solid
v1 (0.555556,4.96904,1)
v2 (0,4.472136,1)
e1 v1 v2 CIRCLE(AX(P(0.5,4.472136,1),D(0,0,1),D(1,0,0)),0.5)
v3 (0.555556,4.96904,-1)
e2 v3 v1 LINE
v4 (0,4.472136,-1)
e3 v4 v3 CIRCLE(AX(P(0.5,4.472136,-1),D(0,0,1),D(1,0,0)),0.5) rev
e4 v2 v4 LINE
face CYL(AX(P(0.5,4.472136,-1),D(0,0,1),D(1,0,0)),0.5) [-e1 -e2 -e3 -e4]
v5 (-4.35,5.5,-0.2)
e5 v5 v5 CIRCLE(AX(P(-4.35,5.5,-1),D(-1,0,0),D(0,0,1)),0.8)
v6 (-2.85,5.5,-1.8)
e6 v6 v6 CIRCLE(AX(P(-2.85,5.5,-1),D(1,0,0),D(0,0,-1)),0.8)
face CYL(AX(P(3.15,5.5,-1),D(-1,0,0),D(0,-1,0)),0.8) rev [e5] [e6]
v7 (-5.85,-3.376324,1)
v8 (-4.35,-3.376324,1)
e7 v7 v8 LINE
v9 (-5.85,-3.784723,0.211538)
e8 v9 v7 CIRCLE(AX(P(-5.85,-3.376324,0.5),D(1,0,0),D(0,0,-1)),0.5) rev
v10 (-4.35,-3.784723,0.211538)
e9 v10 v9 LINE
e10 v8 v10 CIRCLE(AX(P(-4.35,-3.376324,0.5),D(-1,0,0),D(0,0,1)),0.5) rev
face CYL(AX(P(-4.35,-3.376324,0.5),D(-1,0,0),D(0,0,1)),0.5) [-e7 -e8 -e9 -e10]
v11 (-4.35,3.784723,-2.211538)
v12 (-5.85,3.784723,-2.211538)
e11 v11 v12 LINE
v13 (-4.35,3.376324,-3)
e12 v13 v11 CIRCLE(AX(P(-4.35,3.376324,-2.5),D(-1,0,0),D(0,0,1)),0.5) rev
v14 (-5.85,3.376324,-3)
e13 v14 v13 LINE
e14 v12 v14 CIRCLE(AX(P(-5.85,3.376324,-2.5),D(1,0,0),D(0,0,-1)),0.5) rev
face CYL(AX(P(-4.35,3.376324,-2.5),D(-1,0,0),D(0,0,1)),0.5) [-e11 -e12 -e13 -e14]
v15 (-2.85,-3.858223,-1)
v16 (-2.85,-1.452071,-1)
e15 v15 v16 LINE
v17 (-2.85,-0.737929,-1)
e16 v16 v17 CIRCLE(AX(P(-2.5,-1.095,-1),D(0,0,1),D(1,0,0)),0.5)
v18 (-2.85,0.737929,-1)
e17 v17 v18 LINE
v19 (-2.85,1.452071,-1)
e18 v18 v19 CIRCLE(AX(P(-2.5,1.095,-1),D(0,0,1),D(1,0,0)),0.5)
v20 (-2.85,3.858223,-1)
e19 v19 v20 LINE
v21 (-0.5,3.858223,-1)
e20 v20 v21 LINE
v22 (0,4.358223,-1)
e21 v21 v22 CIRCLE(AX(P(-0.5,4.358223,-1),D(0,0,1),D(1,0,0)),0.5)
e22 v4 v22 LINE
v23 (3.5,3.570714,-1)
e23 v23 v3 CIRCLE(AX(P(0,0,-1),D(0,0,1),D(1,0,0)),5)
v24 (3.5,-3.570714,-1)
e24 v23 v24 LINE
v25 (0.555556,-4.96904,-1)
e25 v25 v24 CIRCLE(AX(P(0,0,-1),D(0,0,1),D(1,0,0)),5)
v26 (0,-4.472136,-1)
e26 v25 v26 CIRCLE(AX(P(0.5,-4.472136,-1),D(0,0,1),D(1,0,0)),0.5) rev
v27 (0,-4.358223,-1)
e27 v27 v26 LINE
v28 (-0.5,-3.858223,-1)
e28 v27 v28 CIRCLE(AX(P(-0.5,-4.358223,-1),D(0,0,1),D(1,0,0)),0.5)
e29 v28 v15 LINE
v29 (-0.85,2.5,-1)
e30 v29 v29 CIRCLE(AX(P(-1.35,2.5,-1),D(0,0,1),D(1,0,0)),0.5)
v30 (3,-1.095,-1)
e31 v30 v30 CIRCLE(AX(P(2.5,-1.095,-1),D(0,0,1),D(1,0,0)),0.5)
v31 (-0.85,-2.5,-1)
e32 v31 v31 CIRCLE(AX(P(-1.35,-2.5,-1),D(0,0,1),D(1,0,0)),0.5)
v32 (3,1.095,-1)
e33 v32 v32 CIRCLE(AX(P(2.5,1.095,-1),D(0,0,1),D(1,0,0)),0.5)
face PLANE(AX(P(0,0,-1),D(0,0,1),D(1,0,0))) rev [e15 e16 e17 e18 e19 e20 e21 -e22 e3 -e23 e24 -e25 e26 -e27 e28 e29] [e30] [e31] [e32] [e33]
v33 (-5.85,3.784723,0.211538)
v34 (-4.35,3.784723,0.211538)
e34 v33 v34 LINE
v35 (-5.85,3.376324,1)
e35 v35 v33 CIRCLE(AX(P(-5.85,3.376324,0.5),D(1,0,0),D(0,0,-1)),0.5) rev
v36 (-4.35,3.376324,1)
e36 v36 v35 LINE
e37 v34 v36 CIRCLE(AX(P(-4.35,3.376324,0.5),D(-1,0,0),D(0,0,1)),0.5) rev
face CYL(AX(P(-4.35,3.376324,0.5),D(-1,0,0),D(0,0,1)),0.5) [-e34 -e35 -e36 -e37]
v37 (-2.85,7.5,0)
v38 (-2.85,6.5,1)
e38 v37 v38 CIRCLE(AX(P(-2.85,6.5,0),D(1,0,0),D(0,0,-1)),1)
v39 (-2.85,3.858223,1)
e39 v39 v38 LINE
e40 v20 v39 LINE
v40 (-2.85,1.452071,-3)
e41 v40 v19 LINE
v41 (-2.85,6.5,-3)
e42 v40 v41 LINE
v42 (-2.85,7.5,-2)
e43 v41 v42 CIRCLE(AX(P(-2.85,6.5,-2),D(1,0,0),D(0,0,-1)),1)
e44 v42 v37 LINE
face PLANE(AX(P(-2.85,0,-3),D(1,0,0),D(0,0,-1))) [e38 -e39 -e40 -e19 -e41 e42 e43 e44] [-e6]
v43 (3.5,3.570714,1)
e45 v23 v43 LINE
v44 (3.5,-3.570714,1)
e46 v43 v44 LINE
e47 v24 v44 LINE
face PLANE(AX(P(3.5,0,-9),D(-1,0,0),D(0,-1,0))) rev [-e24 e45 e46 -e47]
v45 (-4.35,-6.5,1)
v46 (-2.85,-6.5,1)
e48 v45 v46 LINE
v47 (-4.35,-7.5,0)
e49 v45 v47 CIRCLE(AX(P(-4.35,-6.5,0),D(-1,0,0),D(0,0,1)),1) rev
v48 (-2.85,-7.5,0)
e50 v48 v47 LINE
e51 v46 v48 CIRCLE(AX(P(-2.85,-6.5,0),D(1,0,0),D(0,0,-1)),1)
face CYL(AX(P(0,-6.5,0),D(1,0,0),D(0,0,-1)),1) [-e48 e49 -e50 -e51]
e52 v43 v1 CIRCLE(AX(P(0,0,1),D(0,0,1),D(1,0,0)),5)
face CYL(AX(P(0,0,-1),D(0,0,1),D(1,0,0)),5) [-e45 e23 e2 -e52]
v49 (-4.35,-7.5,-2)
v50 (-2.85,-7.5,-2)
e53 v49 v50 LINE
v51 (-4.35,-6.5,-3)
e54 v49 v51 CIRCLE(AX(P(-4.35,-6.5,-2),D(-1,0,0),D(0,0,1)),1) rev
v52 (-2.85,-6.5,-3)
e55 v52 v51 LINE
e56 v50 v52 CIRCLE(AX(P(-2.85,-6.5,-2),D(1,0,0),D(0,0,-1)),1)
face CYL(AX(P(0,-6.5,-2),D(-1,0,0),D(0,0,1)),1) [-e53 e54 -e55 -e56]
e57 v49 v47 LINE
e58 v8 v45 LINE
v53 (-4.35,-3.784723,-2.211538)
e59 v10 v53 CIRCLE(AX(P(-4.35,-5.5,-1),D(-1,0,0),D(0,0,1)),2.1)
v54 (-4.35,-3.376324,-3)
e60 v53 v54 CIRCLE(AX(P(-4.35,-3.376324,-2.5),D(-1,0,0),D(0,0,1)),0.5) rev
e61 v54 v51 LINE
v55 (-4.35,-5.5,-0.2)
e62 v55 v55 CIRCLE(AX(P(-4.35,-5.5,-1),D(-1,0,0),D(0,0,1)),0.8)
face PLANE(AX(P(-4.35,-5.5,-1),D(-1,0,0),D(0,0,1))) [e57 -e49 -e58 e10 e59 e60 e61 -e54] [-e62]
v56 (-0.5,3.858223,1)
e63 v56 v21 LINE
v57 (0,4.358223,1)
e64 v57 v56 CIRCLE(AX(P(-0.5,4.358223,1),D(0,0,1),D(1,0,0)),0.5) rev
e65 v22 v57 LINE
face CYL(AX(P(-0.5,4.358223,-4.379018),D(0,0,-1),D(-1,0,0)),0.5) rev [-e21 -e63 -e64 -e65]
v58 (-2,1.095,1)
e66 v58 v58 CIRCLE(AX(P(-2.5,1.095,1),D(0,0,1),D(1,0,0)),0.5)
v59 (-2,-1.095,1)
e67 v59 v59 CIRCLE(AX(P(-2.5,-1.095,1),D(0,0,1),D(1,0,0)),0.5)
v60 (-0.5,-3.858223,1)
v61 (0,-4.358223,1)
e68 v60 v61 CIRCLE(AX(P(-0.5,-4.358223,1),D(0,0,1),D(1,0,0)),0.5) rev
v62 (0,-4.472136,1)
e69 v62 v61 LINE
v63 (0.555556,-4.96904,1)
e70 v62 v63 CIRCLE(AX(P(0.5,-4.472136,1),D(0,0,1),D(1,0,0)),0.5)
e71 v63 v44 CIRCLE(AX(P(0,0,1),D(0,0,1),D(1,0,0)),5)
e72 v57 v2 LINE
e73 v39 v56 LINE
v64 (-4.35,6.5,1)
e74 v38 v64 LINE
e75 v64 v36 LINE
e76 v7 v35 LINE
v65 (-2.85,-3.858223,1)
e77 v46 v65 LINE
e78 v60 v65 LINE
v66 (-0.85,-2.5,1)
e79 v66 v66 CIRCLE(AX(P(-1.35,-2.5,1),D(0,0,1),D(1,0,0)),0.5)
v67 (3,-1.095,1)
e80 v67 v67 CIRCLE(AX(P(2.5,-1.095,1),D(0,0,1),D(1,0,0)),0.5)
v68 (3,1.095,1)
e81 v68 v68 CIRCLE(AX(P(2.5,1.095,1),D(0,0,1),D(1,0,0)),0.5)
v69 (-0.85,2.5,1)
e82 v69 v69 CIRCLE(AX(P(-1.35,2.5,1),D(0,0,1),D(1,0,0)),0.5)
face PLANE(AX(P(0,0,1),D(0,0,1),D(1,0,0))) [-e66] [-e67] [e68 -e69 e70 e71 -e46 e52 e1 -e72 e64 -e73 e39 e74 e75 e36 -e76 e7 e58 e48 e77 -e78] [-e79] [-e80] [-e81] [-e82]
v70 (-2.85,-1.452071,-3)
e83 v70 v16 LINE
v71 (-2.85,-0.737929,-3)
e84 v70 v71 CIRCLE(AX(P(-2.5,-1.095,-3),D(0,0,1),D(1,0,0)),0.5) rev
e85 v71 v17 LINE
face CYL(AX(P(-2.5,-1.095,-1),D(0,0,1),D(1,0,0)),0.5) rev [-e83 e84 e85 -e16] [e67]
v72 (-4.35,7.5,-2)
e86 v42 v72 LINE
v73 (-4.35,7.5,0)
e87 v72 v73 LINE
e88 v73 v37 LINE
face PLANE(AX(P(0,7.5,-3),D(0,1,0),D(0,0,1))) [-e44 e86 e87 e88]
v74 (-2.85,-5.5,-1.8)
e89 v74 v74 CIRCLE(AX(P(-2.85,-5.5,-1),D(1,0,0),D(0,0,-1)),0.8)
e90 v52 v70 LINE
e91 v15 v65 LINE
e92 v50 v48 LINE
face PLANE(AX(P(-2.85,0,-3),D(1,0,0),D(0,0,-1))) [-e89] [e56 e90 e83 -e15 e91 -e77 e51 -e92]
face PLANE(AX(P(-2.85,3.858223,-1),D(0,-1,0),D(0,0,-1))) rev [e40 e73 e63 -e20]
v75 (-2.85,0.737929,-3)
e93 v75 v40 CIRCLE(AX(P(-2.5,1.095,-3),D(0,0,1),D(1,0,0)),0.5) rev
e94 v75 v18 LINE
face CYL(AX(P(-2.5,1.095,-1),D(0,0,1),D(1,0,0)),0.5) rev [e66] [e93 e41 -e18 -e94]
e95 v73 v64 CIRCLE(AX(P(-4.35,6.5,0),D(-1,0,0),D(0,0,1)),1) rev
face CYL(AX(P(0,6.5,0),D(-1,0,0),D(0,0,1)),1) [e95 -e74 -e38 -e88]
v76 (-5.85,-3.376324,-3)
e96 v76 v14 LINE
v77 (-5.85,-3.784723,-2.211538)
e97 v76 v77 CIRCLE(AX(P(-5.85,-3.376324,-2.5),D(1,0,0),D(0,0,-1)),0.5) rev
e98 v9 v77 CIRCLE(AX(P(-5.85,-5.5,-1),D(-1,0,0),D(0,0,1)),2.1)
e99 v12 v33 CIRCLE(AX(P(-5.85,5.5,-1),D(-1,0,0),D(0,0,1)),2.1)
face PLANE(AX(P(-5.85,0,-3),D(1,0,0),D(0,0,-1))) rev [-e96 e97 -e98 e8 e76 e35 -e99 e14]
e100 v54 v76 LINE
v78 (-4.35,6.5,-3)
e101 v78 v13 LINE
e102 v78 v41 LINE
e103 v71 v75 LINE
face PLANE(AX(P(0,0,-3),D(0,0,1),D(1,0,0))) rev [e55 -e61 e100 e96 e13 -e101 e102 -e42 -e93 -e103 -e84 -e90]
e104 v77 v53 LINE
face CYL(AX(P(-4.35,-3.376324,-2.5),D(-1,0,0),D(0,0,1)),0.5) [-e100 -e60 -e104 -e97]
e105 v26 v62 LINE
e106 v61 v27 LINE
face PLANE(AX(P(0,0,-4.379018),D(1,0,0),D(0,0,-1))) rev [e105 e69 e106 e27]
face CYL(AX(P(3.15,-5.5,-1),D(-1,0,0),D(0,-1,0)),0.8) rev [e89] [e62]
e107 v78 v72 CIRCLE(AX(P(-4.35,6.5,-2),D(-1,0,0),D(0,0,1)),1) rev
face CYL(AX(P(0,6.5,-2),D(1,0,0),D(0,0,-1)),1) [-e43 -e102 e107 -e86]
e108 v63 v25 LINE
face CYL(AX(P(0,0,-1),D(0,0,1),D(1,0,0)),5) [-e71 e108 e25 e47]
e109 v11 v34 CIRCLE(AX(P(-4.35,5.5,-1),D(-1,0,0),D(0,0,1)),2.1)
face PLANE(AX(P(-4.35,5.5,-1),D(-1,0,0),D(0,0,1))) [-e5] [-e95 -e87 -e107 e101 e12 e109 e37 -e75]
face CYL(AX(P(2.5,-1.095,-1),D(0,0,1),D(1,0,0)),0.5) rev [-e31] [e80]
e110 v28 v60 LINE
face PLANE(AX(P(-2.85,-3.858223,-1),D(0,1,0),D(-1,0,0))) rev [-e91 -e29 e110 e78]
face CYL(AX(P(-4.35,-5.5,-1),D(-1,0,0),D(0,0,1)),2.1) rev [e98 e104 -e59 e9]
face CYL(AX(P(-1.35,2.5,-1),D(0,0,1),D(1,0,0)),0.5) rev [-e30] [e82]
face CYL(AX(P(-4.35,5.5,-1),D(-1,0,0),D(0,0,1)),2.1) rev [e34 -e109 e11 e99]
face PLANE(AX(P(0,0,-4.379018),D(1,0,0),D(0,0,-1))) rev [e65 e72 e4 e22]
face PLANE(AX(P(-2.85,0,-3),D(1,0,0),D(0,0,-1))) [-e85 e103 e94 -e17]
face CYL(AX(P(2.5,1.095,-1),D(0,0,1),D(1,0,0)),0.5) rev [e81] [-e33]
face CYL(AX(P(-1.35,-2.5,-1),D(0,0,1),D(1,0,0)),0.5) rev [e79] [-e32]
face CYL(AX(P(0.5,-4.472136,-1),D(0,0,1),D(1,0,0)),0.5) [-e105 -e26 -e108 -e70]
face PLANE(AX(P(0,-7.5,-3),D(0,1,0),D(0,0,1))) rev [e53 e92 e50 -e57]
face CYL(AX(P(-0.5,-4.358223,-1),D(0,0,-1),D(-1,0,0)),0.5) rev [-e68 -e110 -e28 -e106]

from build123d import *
from build123d.topology import SkipClean

# Parameters (mm, degrees)
BOSS_EXTRUDE1_DEPTH       = 1
BOSS_EXTRUDE1_DEPTH_BACK  = 1
SKETCH1_R                 = 5
SKETCH1_R_2               = 0.5
BOSS_EXTRUDE2_START       = -5.85
BOSS_EXTRUDE2_OUTLINE_W   = 15
BOSS_EXTRUDE2_OUTLINE_H   = 4
BOSS_EXTRUDE2_DEPTH       = 3
BOSS_EXTRUDE2_START_2     = -4
BOSS_EXTRUDE2_2_OUTLINE_R = 0.5
BOSS_EXTRUDE2_2_DEPTH     = 6
CUT_EXTRUDE4_DEPTH        = 8
SKETCH6_R                 = 0.8
CUT_EXTRUDE3_DEPTH        = 9
SKETCH9_W                 = 8
SKETCH9_H                 = 0.25
CUT_EXTRUDE5_DEPTH        = 2
SKETCH10_R                = 2.1
SKETCH10_R_2              = 0.8
CUT_EXTRUDE6_DEPTH        = 1.5
FILLET2_R                 = 1
FILLET3_START             = -5.85
FILLET3_DEPTH             = 1.5
CUT_EXTRUDE2_START        = -10
CUT_EXTRUDE2_DEPTH        = 10
BOSS_EXTRUDE3_START       = -2
BOSS_EXTRUDE3_DEPTH       = 2
FILLET4_R                 = 0.5
CUT_EXTRUDE7_DEPTH        = 1.5


with BuildPart() as part:
    # Sketch1 → Boss-Extrude1 (new, two sides: drawn at the far end of the back side and taken through both)
    with BuildSketch(Plane.XY.offset(-BOSS_EXTRUDE1_DEPTH_BACK)):
        Circle(SKETCH1_R)
        with Locations((-2.5, 1.095)):
            Circle(SKETCH1_R_2, mode=Mode.SUBTRACT)
        with Locations((2.5, 1.095)):
            Circle(SKETCH1_R_2, mode=Mode.SUBTRACT)
        with Locations((-2.5, -1.095)):
            Circle(SKETCH1_R_2, mode=Mode.SUBTRACT)
        with Locations((2.5, -1.095)):
            Circle(SKETCH1_R_2, mode=Mode.SUBTRACT)
        with Locations((-1.35, 2.5)):
            Circle(SKETCH1_R_2, mode=Mode.SUBTRACT)
        with Locations((-1.35, -2.5)):
            Circle(SKETCH1_R_2, mode=Mode.SUBTRACT)
    extrude(amount=BOSS_EXTRUDE1_DEPTH + BOSS_EXTRUDE1_DEPTH_BACK)

    # Boss-Extrude2: read off the stored shape, not the designer's step
    # Boss-Extrude2 outline → Boss-Extrude2 (add)
    with BuildSketch(Plane.YZ.offset(BOSS_EXTRUDE2_START)):
        with Locations((0, -1)):
            Rectangle(BOSS_EXTRUDE2_OUTLINE_W, BOSS_EXTRUDE2_OUTLINE_H)
    extrude(amount=BOSS_EXTRUDE2_DEPTH)

    # Boss-Extrude2 2 outline → Boss-Extrude2 2 (cut)
    with SkipClean():  # the faces are left unmerged after this step: merging them gives an invalid solid
        with BuildSketch(Plane.XY.offset(BOSS_EXTRUDE2_START_2)):
            with Locations((-2.5, 1.095)):
                Circle(BOSS_EXTRUDE2_2_OUTLINE_R)
            with Locations((-2.5, -1.095)):
                Circle(BOSS_EXTRUDE2_2_OUTLINE_R)
        extrude(amount=BOSS_EXTRUDE2_2_DEPTH, mode=Mode.SUBTRACT)

    # Sketch7 → Cut-Extrude4 (cut)
    with SkipClean():  # the faces are left unmerged after this step: merging them gives an invalid solid
        with BuildSketch(Plane(origin=(-2.85, 0, 0), x_dir=(0, 0, -1), z_dir=(1, 0, 0))):
            Polygon((-1, 7.5), (-1, 4.10822346), (1, 4.10822346), (1, 1.452071421), (3, 1.452071421), (3, 7.5), align=None)
            Polygon((-1, -4.10822346), (-1, -7.5), (3, -7.5), (3, -1.452071421), (1, -1.452071421), (1, -4.10822346), align=None)
        extrude(amount=CUT_EXTRUDE4_DEPTH, mode=Mode.SUBTRACT)

    # Sketch6 → Cut-Extrude3 (cut)
    with SkipClean():  # the faces are left unmerged after this step: merging them gives an invalid solid
        with BuildSketch(Plane.ZY.offset(5.85)):
            with Locations(Location((-1, 5.5, 0), (0, 0, 270))):
                Circle(SKETCH6_R)
            with Locations(Location((-1, -5.5, 0), (0, 0, 270))):
                Circle(SKETCH6_R)
        extrude(amount=-CUT_EXTRUDE3_DEPTH, mode=Mode.SUBTRACT)

    # Sketch9 → Cut-Extrude5 (cut)
    with SkipClean():  # the faces are left unmerged after this step: merging them gives an invalid solid
        with BuildSketch(Plane.XY.offset(1)):
            with Locations((1.15, 3.98322346)):
                Rectangle(SKETCH9_W, SKETCH9_H)
            with Locations((1.15, -3.98322346)):
                Rectangle(SKETCH9_W, SKETCH9_H)
        extrude(amount=-CUT_EXTRUDE5_DEPTH, mode=Mode.SUBTRACT)

    # Sketch10 → Cut-Extrude6 (cut)
    # profile 1 of 2: a face of its own
    with SkipClean():  # the faces are left unmerged after this step: merging them gives an invalid solid
        with BuildSketch(Plane.ZY.offset(5.85)):
            with Locations((-1, 5.5)):
                Circle(SKETCH10_R)
            with Locations((-1, 5.5)):
                Circle(SKETCH10_R_2, mode=Mode.SUBTRACT)
        # profile 2 of 2: a face of its own
        with BuildSketch(Plane.ZY.offset(5.85)):
            with Locations((-1, -5.5)):
                Circle(SKETCH10_R)
            with Locations((-1, -5.5)):
                Circle(SKETCH10_R_2, mode=Mode.SUBTRACT)
        extrude(amount=-CUT_EXTRUDE6_DEPTH, mode=Mode.SUBTRACT)

    # Fillet2
    fillet2_edges = [part.edges().sort_by_distance(p)[0] for p in [
        (-4.35, 7.5, -3),
        (-4.35, -7.5, 1),
        (-4.35, -7.5, -3),
        (-4.35, 7.5, 1),
    ]]
    fillet(fillet2_edges, radius=FILLET2_R)

    # Fillet3: read off the stored shape, not the designer's step
    # Fillet3 outline → Fillet3 (cut)
    with SkipClean():  # the faces are left unmerged after this step: merging them gives an invalid solid
        with BuildSketch(Plane.YZ.offset(FILLET3_START)):
            with BuildLine():
                ThreePointArc((-6.696065005, -2.726102113), (-6.574273302, -2.846043449), (-6.5, -3))
                Line((-6.5, -3), (-6.140312424, -3))
                ThreePointArc((-6.140312424, -3), (-6.428345587, -2.883659861), (-6.696065005, -2.726102113))
            make_face()
            with BuildLine():
                ThreePointArc((-7.5, -2), (-7.346043449, -2.074273302), (-7.226102113, -2.196065005))
                ThreePointArc((-7.226102113, -2.196065005), (-7.383659861, -1.928345587), (-7.5, -1.640312424))
                Line((-7.5, -1.640312424), (-7.5, -2))
            make_face()
            with BuildLine():
                ThreePointArc((-3.784723184, -2.211538462), (-4.257978234, -2.693334561), (-4.859687576, -3))
                Line((-4.859687576, -3), (-3.376323942, -3))
                ThreePointArc((-3.376323942, -3), (-3.820300726, -2.729966553), (-3.784723184, -2.211538462))
            make_face()
            with BuildLine():
                Line((-7.5, 0), (-7.5, -0.359687576))
                ThreePointArc((-7.5, -0.359687576), (-7.383659861, -0.071654413), (-7.226102112, 0.196065005))
                ThreePointArc((-7.226102112, 0.196065005), (-7.346043449, 0.074273302), (-7.5, 0))
            make_face()
            with BuildLine():
                ThreePointArc((-4.859687576, 1), (-4.257978234, 0.693334561), (-3.784723184, 0.211538462))
                ThreePointArc((-3.784723184, 0.211538462), (-3.820300726, 0.729966553), (-3.376323942, 1))
                Line((-3.376323942, 1), (-4.859687576, 1))
            make_face()
            with BuildLine():
                ThreePointArc((3.784723184, -2.211538462), (3.820300726, -2.729966553), (3.376323942, -3))
                Line((3.376323942, -3), (4.859687576, -3))
                ThreePointArc((4.859687576, -3), (4.257978234, -2.693334561), (3.784723184, -2.211538462))
            make_face()
            with BuildLine():
                ThreePointArc((-6.5, 1), (-6.574273302, 0.846043449), (-6.696065005, 0.726102113))
                ThreePointArc((-6.696065005, 0.726102113), (-6.428345587, 0.883659861), (-6.140312424, 1))
                Line((-6.140312424, 1), (-6.5, 1))
            make_face()
            with BuildLine():
                Line((4.859687576, 1), (3.376323942, 1))
                ThreePointArc((3.376323942, 1), (3.820300726, 0.729966553), (3.784723184, 0.211538462))
                ThreePointArc((3.784723184, 0.211538462), (4.257978234, 0.693334561), (4.859687576, 1))
            make_face()
            with BuildLine():
                ThreePointArc((6.696065005, -2.726102112), (6.428345587, -2.883659861), (6.140312424, -3))
                Line((6.140312424, -3), (6.5, -3))
                ThreePointArc((6.5, -3), (6.574273302, -2.846043449), (6.696065005, -2.726102112))
            make_face()
            with BuildLine():
                Line((6.5, 1), (6.140312424, 1))
                ThreePointArc((6.140312424, 1), (6.428345587, 0.883659861), (6.696065005, 0.726102112))
                ThreePointArc((6.696065005, 0.726102112), (6.574273302, 0.846043449), (6.5, 1))
            make_face()
            with BuildLine():
                ThreePointArc((7.5, -1.640312424), (7.383659861, -1.928345587), (7.226102112, -2.196065005))
                ThreePointArc((7.226102112, -2.196065005), (7.346043449, -2.074273302), (7.5, -2))
                Line((7.5, -2), (7.5, -1.640312424))
            make_face()
            with BuildLine():
                ThreePointArc((7.5, 0), (7.346043449, 0.074273302), (7.226102113, 0.196065005))
                ThreePointArc((7.226102113, 0.196065005), (7.383659861, -0.071654413), (7.5, -0.359687576))
                Line((7.5, -0.359687576), (7.5, 0))
            make_face()
        extrude(amount=FILLET3_DEPTH, mode=Mode.SUBTRACT)

    # Sketch3 → Cut-Extrude2 (cut)
    with SkipClean():  # the faces are left unmerged after this step: merging them gives an invalid solid
        with BuildSketch(Plane.XY.offset(1).offset(CUT_EXTRUDE2_START)):
            with BuildLine():
                ThreePointArc((3.5, -3.570714214), (5, 0), (3.5, 3.570714214))
                Line((3.5, 3.570714214), (3.5, -3.570714214))
            make_face()
        extrude(amount=CUT_EXTRUDE2_DEPTH, mode=Mode.SUBTRACT)

    # Sketch11 → Boss-Extrude3 (add)
    with SkipClean():  # the faces are left unmerged after this step: merging them gives an invalid solid
        with BuildSketch(Plane.XY.offset(1).offset(BOSS_EXTRUDE3_START)):
            with BuildLine():
                Line((0, -3.85822346), (0, -5))
                ThreePointArc((0, -5), (1.689509204, -4.705906783), (3.180269129, -3.85822346))
                Line((3.180269129, -3.85822346), (0, -3.85822346))
            make_face()
            with BuildLine():
                Line((0, 5), (0, 3.85822346))
                Line((0, 3.85822346), (3.180269129, 3.85822346))
                ThreePointArc((3.180269129, 3.85822346), (1.689509204, 4.705906783), (0, 5))
            make_face()
        extrude(amount=BOSS_EXTRUDE3_DEPTH)

    # Fillet4
    fillet4_edges = [part.edges().sort_by_distance(p)[0] for p in [
        (0, -5, 0),
        (0, -3.85822346, 0),
        (0, 3.85822346, 0),
        (0, 5, 0),
    ]]
    fillet(fillet4_edges, radius=FILLET4_R)

    # Sketch12 → Cut-Extrude7 (cut)
    with BuildSketch(Plane.ZY.offset(5.85)):
        with BuildLine():
            ThreePointArc((1, 6.5), (0.707106781, 7.207106781), (0, 7.5))
            ThreePointArc((0, 7.5), (0.074273302, 7.346043449), (0.196065005, 7.226102113))
            ThreePointArc((0.196065005, 7.226102113), (0.48492424, 6.98492424), (0.726102113, 6.696065005))
            ThreePointArc((0.726102113, 6.696065005), (0.846043449, 6.574273302), (1, 6.5))
        make_face()
        with BuildLine():
            ThreePointArc((-2.726102113, -6.696065005), (-2.48492424, -6.98492424), (-2.196065005, -7.226102113))
            ThreePointArc((-2.196065005, -7.226102113), (-2.074273302, -7.346043449), (-2, -7.5))
            ThreePointArc((-2, -7.5), (-2.707106781, -7.207106781), (-3, -6.5))
            ThreePointArc((-3, -6.5), (-2.846043449, -6.574273302), (-2.726102113, -6.696065005))
        make_face()
        with BuildLine():
            ThreePointArc((0, -7.5), (0.707106781, -7.207106781), (1, -6.5))
            ThreePointArc((1, -6.5), (0.846043449, -6.574273302), (0.726102113, -6.696065005))
            ThreePointArc((0.726102113, -6.696065005), (0.48492424, -6.98492424), (0.196065005, -7.226102113))
            ThreePointArc((0.196065005, -7.226102113), (0.074273302, -7.346043449), (0, -7.5))
        make_face()
        with BuildLine():
            ThreePointArc((-2, 7.5), (-2.707106781, 7.207106781), (-3, 6.5))
            ThreePointArc((-3, 6.5), (-2.846043449, 6.574273302), (-2.726102113, 6.696065005))
            ThreePointArc((-2.726102113, 6.696065005), (-2.48492424, 6.98492424), (-2.196065005, 7.226102113))
            ThreePointArc((-2.196065005, 7.226102113), (-2.074273302, 7.346043449), (-2, 7.5))
        make_face()
    extrude(amount=-CUT_EXTRUDE7_DEPTH, mode=Mode.SUBTRACT)


solid = part.part
